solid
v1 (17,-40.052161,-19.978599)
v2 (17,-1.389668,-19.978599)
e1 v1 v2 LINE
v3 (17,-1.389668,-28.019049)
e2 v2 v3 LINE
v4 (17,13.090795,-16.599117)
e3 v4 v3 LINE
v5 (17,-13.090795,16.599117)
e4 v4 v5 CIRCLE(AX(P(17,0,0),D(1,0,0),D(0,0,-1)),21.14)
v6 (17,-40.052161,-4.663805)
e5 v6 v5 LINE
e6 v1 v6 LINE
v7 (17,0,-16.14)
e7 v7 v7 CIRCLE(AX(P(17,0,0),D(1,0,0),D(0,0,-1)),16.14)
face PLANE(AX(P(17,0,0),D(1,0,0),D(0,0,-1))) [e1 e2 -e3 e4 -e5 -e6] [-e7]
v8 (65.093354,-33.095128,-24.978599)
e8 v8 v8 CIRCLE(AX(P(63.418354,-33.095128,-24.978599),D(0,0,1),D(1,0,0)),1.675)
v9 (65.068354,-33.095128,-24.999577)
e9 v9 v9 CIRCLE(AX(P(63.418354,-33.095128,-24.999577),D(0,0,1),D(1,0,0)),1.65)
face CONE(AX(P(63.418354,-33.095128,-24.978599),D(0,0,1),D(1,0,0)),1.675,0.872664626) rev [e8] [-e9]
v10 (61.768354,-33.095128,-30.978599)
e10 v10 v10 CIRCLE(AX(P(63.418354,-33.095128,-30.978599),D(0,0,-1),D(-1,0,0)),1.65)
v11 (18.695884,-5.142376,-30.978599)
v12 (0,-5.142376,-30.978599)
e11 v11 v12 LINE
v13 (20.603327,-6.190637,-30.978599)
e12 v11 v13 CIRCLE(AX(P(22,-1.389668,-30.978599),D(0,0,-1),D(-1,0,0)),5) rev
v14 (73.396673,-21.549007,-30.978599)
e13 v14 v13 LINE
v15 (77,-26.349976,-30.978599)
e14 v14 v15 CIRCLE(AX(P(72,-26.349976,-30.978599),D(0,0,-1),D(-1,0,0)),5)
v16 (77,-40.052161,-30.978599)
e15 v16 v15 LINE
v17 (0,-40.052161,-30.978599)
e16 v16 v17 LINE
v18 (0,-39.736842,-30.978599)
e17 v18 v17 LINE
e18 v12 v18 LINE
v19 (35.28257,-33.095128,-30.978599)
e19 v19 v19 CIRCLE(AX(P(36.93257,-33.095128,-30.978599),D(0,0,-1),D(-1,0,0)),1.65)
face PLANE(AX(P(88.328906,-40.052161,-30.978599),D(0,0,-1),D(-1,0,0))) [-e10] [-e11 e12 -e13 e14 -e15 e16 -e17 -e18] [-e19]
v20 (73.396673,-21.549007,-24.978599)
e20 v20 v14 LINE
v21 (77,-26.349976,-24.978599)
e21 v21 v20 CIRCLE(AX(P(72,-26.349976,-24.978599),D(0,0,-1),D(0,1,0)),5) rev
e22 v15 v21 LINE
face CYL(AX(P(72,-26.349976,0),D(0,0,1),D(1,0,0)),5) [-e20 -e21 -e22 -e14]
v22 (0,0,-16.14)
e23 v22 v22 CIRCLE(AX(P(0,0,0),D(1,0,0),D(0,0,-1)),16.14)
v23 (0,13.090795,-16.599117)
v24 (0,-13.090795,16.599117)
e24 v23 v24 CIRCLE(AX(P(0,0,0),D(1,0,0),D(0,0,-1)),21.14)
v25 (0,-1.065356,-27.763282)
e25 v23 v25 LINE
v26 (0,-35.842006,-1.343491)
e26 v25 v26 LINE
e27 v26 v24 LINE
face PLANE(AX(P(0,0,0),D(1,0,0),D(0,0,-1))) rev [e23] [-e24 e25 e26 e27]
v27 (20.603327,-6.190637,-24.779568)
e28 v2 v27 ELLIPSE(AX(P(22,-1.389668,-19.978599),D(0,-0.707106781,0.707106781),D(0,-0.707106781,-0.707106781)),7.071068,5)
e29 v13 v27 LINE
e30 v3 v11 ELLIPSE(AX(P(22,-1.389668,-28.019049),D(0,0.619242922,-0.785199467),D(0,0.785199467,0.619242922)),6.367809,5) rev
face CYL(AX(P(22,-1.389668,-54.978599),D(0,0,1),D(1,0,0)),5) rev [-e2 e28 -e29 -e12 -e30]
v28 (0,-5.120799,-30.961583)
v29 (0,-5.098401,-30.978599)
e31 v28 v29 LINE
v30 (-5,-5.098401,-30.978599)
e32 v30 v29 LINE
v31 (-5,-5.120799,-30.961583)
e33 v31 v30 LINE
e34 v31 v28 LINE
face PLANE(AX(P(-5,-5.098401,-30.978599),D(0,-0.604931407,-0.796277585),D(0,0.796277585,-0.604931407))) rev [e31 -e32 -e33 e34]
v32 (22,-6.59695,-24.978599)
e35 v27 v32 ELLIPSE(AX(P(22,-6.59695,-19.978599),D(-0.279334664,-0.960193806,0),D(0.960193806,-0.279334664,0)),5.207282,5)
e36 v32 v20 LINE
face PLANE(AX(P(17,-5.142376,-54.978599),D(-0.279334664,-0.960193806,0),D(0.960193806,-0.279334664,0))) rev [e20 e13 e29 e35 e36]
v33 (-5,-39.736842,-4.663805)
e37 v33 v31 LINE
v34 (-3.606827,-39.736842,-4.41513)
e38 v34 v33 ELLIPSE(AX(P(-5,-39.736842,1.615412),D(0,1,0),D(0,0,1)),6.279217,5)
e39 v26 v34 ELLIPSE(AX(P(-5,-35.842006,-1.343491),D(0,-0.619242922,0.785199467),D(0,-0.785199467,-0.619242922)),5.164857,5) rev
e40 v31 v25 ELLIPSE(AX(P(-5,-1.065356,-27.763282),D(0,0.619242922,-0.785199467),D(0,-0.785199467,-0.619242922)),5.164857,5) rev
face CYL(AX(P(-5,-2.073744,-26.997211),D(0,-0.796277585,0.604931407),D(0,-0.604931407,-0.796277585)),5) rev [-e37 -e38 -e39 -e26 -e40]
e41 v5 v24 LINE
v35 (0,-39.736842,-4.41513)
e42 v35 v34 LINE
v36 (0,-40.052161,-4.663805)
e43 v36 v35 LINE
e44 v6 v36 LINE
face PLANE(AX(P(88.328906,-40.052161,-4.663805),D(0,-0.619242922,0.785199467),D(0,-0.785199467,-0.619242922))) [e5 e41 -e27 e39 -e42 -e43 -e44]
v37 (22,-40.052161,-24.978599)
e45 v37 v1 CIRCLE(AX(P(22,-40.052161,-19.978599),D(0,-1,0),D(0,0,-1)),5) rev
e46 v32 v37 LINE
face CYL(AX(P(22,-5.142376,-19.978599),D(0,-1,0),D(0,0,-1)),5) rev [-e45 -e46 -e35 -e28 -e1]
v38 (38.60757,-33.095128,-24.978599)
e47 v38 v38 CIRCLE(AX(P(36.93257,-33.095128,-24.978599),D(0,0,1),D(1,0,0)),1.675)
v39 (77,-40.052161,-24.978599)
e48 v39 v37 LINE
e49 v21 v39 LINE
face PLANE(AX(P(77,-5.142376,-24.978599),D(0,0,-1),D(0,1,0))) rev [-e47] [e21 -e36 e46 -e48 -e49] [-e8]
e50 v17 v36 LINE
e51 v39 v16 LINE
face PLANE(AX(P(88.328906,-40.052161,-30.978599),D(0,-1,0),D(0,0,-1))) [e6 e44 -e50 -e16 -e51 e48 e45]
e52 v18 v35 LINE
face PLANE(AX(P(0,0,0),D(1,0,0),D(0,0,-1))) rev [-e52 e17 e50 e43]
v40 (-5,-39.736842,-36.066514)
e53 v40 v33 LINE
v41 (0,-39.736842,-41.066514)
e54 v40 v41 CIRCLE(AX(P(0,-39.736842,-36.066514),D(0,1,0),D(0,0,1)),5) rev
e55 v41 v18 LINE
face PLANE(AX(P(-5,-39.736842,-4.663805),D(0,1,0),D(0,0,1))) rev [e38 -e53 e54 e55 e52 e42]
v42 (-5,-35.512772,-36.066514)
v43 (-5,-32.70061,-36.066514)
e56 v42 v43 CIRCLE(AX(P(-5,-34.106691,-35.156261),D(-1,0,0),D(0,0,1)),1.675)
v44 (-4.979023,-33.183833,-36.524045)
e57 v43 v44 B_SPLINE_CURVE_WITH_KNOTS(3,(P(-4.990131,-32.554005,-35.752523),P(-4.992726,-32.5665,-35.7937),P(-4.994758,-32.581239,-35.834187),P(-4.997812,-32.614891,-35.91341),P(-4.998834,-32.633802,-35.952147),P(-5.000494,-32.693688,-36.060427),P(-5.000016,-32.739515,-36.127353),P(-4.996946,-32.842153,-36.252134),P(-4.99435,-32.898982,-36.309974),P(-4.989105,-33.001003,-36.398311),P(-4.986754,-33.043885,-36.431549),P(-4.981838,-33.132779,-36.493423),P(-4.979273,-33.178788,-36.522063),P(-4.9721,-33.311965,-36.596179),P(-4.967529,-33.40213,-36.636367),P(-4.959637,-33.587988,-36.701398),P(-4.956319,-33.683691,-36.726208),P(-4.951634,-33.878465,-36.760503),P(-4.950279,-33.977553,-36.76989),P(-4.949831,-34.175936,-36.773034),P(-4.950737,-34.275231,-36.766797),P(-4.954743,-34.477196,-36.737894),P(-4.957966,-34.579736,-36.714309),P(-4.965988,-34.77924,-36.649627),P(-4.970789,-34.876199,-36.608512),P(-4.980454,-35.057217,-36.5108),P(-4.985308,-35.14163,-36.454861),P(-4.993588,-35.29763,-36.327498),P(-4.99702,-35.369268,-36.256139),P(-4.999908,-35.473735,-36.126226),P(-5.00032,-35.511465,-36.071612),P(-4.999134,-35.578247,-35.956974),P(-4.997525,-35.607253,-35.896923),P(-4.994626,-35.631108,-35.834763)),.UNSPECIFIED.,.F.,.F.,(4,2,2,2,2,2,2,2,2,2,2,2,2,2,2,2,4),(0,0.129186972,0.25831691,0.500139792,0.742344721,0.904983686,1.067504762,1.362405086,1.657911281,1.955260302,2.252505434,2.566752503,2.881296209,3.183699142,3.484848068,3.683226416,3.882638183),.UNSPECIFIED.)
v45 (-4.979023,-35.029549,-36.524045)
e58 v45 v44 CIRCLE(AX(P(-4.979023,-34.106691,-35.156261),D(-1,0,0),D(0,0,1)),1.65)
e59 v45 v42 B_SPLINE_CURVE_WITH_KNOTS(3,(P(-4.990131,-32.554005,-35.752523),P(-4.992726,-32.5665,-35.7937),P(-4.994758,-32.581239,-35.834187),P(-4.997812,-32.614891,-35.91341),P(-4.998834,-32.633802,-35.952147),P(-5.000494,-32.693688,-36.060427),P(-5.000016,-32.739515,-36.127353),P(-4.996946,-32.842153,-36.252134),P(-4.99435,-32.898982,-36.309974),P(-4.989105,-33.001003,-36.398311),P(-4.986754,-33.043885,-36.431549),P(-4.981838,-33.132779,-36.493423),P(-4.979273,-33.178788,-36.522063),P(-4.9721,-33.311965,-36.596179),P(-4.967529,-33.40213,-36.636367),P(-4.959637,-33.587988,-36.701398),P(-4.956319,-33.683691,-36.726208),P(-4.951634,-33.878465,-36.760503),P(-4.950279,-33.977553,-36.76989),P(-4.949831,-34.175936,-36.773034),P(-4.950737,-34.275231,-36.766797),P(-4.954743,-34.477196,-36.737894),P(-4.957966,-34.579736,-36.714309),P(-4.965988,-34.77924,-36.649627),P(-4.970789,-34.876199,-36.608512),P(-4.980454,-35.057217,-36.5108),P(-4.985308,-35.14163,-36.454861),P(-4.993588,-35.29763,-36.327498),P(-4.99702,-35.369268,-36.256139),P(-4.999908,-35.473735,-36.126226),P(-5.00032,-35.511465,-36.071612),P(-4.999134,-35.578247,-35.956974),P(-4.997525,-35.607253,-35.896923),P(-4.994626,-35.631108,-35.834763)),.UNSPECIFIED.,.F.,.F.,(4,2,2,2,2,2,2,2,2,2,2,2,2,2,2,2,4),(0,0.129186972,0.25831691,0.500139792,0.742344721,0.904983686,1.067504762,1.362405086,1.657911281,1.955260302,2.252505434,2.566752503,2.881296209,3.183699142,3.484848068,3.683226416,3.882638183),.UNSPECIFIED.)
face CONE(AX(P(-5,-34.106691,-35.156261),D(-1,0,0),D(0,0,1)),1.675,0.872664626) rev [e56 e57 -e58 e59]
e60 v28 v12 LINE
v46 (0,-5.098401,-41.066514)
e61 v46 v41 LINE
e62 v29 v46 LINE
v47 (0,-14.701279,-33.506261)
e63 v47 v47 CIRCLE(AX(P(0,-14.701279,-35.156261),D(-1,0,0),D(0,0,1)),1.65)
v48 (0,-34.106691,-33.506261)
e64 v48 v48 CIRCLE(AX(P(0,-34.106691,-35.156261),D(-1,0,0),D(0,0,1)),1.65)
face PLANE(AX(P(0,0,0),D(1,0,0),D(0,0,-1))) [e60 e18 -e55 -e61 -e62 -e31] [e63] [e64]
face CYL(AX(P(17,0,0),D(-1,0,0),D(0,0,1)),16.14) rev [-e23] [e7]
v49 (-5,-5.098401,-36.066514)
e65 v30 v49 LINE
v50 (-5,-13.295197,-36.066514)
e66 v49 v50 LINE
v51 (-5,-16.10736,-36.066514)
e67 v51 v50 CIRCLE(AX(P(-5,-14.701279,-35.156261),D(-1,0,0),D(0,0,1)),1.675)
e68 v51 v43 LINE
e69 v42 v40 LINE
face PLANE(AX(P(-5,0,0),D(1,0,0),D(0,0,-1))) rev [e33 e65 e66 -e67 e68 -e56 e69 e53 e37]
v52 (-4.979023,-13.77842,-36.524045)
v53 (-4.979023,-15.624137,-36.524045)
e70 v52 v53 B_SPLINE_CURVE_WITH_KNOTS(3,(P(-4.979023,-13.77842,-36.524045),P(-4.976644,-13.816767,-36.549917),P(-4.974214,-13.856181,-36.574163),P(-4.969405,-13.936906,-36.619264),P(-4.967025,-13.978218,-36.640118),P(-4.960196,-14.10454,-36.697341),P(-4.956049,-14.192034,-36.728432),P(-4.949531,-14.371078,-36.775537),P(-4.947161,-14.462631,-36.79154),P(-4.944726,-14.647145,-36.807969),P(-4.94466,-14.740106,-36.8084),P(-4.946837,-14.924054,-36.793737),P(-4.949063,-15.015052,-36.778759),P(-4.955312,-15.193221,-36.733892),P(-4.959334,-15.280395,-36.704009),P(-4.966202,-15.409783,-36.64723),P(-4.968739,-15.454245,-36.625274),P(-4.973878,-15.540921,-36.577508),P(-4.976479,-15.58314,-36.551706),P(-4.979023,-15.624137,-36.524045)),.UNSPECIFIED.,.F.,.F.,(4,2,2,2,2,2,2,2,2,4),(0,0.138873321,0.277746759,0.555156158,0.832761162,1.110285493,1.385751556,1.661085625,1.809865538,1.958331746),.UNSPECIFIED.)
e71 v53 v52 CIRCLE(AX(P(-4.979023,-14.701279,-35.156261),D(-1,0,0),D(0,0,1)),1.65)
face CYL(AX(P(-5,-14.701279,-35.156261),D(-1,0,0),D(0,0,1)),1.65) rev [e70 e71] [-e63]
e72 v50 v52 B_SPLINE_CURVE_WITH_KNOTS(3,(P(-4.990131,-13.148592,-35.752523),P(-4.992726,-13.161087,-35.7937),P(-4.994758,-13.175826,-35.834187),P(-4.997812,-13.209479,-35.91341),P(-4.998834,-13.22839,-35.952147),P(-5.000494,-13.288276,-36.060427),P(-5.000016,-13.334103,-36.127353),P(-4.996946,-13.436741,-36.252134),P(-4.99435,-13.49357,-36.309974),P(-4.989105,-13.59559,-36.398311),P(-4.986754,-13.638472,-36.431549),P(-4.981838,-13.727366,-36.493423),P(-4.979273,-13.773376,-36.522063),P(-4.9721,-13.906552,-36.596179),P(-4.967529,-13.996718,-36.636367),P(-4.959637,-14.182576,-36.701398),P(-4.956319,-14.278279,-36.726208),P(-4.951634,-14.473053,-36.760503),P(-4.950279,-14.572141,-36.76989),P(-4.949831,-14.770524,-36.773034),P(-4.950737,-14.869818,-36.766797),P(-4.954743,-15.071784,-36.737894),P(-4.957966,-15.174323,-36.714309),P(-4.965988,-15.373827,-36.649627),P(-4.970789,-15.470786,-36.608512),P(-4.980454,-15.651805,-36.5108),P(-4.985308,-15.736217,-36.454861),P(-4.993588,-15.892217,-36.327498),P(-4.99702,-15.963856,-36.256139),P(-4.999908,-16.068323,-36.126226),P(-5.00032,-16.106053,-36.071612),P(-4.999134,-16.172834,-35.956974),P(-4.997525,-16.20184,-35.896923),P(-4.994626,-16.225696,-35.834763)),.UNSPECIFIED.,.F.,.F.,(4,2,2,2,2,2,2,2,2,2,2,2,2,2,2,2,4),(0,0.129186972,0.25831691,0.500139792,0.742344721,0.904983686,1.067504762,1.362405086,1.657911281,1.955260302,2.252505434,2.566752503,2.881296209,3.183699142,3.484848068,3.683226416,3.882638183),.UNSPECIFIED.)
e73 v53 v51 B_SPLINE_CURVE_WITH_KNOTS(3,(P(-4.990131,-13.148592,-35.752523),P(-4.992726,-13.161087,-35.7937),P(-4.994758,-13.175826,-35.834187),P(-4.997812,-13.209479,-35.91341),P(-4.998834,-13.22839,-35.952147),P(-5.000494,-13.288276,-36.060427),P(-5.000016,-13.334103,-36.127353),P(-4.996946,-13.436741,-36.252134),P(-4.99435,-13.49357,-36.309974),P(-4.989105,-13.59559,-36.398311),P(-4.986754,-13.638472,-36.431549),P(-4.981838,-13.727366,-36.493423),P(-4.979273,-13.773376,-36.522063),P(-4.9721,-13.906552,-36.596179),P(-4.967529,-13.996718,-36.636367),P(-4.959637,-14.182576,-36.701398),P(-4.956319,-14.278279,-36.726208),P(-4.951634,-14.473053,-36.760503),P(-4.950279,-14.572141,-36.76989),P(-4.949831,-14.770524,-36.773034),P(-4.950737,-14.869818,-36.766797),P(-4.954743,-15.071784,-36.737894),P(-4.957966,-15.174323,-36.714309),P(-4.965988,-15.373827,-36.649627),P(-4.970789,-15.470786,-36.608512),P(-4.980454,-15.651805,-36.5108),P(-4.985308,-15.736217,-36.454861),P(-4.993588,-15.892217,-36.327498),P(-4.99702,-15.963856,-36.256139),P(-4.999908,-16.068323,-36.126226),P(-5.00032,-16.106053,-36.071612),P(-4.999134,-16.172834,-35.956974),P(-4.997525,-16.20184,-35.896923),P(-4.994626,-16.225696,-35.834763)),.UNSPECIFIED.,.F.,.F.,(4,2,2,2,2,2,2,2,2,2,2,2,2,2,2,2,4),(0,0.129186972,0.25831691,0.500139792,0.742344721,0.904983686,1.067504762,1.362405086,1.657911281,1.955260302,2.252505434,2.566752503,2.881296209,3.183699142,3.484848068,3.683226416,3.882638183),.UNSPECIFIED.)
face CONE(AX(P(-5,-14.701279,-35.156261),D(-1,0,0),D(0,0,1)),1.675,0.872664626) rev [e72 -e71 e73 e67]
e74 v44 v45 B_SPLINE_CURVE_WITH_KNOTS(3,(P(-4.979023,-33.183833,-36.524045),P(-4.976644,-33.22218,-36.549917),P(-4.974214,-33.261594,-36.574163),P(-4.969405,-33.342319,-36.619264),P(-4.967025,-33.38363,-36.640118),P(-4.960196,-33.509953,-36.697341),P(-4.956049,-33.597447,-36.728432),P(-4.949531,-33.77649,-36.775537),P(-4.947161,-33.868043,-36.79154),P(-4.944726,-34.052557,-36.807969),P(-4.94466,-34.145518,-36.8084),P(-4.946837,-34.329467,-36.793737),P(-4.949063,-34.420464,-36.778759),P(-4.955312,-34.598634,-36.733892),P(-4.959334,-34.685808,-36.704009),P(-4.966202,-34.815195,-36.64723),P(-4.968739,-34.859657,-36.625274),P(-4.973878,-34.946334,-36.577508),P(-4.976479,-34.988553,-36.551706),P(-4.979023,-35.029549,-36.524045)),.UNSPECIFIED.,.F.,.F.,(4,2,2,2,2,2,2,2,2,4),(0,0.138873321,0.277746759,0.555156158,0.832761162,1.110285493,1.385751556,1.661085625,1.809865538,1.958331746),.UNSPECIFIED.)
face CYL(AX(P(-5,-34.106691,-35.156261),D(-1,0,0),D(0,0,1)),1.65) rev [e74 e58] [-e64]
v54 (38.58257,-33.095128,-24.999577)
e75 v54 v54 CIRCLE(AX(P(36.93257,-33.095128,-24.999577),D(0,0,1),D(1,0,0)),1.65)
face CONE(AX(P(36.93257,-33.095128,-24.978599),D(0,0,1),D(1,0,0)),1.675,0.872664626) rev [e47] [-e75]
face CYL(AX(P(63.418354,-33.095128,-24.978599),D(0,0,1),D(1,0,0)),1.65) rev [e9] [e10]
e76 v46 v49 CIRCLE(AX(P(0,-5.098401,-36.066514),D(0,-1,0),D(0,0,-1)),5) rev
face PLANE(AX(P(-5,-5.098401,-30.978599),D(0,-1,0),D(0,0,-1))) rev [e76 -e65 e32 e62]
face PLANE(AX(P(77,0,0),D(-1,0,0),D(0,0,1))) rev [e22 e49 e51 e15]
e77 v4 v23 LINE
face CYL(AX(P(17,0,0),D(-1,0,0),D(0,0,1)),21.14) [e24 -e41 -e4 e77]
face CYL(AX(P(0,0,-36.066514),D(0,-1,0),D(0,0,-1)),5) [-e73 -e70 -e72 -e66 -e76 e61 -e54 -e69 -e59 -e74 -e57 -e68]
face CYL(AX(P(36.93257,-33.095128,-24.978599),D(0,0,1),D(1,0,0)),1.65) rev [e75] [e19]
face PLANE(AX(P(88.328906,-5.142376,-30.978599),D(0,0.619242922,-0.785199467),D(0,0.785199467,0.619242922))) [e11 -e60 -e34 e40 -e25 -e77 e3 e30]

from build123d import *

# Parameters (mm, degrees)
SKETCH1_R                             = 21.14
SKETCH1_R_2                           = 16.14
BOSS_EXTRUDE1_DEPTH                   = 17
BOSS_EXTRUDE2_DEPTH                   = 17
SKETCH3_W                             = 6
SKETCH3_H                             = 34.909785338
BOSS_EXTRUDE3_DEPTH                   = 60
CUT_EXTRUDE1_DEPTH                    = 30
FILLET1_R                             = 5
BOSS_EXTRUDE4_DEPTH                   = 5
FILLET2_R                             = 5
TAP_DRILL_FOR_M4X0_7_TAP1_D           = 3.3
TAP_DRILL_FOR_M4X0_7_TAP1_DEPTH       = 5
TAP_DRILL_FOR_M4X0_7_TAP1_CSINK_D     = 3.35
TAP_DRILL_FOR_M4X0_7_TAP1_CSINK_ANGLE = 100
TAP_DRILL_FOR_M4X0_7_TAP1_TIP         = 0.991420021
TAP_DRILL_FOR_M4X0_7_TAP2_D           = 3.3
TAP_DRILL_FOR_M4X0_7_TAP2_DEPTH       = 7
TAP_DRILL_FOR_M4X0_7_TAP2_CSINK_D     = 3.35
TAP_DRILL_FOR_M4X0_7_TAP2_CSINK_ANGLE = 100
TAP_DRILL_FOR_M4X0_7_TAP2_TIP         = 0.991420021


with BuildPart() as part:
    # Sketch1 → Boss-Extrude1 (new body)
    with BuildSketch(Plane(origin=(0, 0, 0), x_dir=(0, 0, -1), z_dir=(1, 0, 0))):
        Circle(SKETCH1_R)
        Circle(SKETCH1_R_2, mode=Mode.SUBTRACT)
    extrude(amount=BOSS_EXTRUDE1_DEPTH)

    # Sketch2 → Boss-Extrude2 (add)
    with BuildSketch(Plane.ZY):
        with BuildLine():
            Line((-30.978599342, -40.052160935), (-30.978599342, -5.142375597))
            Line((-30.978599342, -5.142375597), (-16.599116733, 13.09079538))
            ThreePointArc((-16.599116733, 13.09079538), (-13.09079538, -16.599116733), (16.599116733, -13.09079538))
            Line((16.599116733, -13.09079538), (-4.663804983, -40.052160935))
            Line((-4.663804983, -40.052160935), (-30.978599342, -40.052160935))
        make_face()
    extrude(amount=-BOSS_EXTRUDE2_DEPTH)

    # Sketch3 → Boss-Extrude3 (add)
    with BuildSketch(Plane(origin=(17, 0, 0), x_dir=(0, 0, -1), z_dir=(1, 0, 0))):
        with Locations((27.978599342, -22.597268266)):
            Rectangle(SKETCH3_W, SKETCH3_H)
    extrude(amount=BOSS_EXTRUDE3_DEPTH)

    # Sketch4 → Cut-Extrude1 (cut)
    with BuildSketch(Plane.XY.offset(-24.978599342)):
        Polygon((17, -5.142375597), (77, -22.597268266), (77, -5.142375597), align=None)
    extrude(amount=-CUT_EXTRUDE1_DEPTH, mode=Mode.SUBTRACT)

    # Fillet1
    fillet1_edges = [part.edges().sort_by_distance(p)[0] for p in [
        (17, -5.142375597, -27.978599342),
        (17, -22.597268266, -24.978599342),
        (77, -22.597268266, -27.978599342),
    ]]
    fillet(fillet1_edges, radius=FILLET1_R)

    # Sketch5 → Boss-Extrude4 (add)
    with BuildSketch(Plane.ZY):
        Polygon((-30.978599342, -5.098400642), (-41.06651396, -5.098400642), (-41.06651396, -39.736841718), (-25.501919328, -39.736841718), (-4.663804983, -39.736841718), align=None)
    extrude(amount=BOSS_EXTRUDE4_DEPTH)

    # Fillet2
    # the kernel refuses this fillet: 5 mm, written as the material it adds along each edge
    with BuildSketch(Plane(origin=(0, -49.690311531, 2.897837608), x_dir=(0, 0.604931407257239, 0.7962775850881252), z_dir=(0, 0.7962775850881253, -0.604931407257239))) as fillet2_piece_1_section:
        with BuildLine():
            CenterArc((FILLET2_R, -FILLET2_R), FILLET2_R, 90, 90)
            Line((0, -FILLET2_R), (0, 0))
            Line((0, 0), (FILLET2_R, 0))
        make_face()
    fillet2_piece_1 = extrude(amount=68.472330766, mode=Mode.PRIVATE)
    fillet2_piece_1 = split(fillet2_piece_1, bisect_by=Plane(origin=(-1.128828845, -8.634761076, -33.732848524), z_dir=(0, -0.6192429224168574, 0.7851994670379179)), keep=Keep.TOP, mode=Mode.PRIVATE)
    fillet2_piece_1 = split(fillet2_piece_1, bisect_by=Plane(origin=(-1.128828845, -34.816351836, -0.534615058), z_dir=(0, 0.6192429224168575, -0.7851994670379177)), keep=Keep.TOP, mode=Mode.PRIVATE)
    fillet2_piece_1 = split(fillet2_piece_1, bisect_by=Plane(origin=(-1.128828845, -39.736841718, -16.726060425), z_dir=(0, 1, 0)), keep=Keep.TOP, mode=Mode.PRIVATE)
    add(fillet2_piece_1)
    # the kernel refuses this fillet: 5 mm, written as the material it takes off along each edge
    with BuildSketch(Plane(origin=(-5, 7.401599358, -41.06651396), x_dir=(0, 0, 1), z_dir=(0, -1, 0))) as fillet2_2_piece_1:
        with BuildLine():
            CenterArc((FILLET2_R, -FILLET2_R), FILLET2_R, 90, 90)
            Line((0, -FILLET2_R), (0, 0))
            Line((0, 0), (FILLET2_R, 0))
        make_face()
    extrude(amount=59.638441075, mode=Mode.SUBTRACT)

    # Tap Drill for M4x0.7 Tap1
    with Locations(Plane.ZY.offset(5)):
        with Locations((-35.156261267, -14.70127854), (-35.156261267, -34.106690994)):
            CounterSinkHole(TAP_DRILL_FOR_M4X0_7_TAP1_D / 2, TAP_DRILL_FOR_M4X0_7_TAP1_CSINK_D / 2, depth=TAP_DRILL_FOR_M4X0_7_TAP1_DEPTH, counter_sink_angle=TAP_DRILL_FOR_M4X0_7_TAP1_CSINK_ANGLE)
            with Locations((0, 0, -(TAP_DRILL_FOR_M4X0_7_TAP1_DEPTH + TAP_DRILL_FOR_M4X0_7_TAP1_TIP / 2))):  # 118° drill point
                Cone(0, TAP_DRILL_FOR_M4X0_7_TAP1_D / 2, TAP_DRILL_FOR_M4X0_7_TAP1_TIP, mode=Mode.SUBTRACT)

    # Tap Drill for M4x0.7 Tap2
    with Locations(Plane.XY.offset(-24.978599342)):
        with Locations((36.93257039, -33.095127913), (63.418354043, -33.095127913)):
            CounterSinkHole(TAP_DRILL_FOR_M4X0_7_TAP2_D / 2, TAP_DRILL_FOR_M4X0_7_TAP2_CSINK_D / 2, depth=TAP_DRILL_FOR_M4X0_7_TAP2_DEPTH, counter_sink_angle=TAP_DRILL_FOR_M4X0_7_TAP2_CSINK_ANGLE)
            with Locations((0, 0, -(TAP_DRILL_FOR_M4X0_7_TAP2_DEPTH + TAP_DRILL_FOR_M4X0_7_TAP2_TIP / 2))):  # 118° drill point
                Cone(0, TAP_DRILL_FOR_M4X0_7_TAP2_D / 2, TAP_DRILL_FOR_M4X0_7_TAP2_TIP, mode=Mode.SUBTRACT)


solid = part.part
